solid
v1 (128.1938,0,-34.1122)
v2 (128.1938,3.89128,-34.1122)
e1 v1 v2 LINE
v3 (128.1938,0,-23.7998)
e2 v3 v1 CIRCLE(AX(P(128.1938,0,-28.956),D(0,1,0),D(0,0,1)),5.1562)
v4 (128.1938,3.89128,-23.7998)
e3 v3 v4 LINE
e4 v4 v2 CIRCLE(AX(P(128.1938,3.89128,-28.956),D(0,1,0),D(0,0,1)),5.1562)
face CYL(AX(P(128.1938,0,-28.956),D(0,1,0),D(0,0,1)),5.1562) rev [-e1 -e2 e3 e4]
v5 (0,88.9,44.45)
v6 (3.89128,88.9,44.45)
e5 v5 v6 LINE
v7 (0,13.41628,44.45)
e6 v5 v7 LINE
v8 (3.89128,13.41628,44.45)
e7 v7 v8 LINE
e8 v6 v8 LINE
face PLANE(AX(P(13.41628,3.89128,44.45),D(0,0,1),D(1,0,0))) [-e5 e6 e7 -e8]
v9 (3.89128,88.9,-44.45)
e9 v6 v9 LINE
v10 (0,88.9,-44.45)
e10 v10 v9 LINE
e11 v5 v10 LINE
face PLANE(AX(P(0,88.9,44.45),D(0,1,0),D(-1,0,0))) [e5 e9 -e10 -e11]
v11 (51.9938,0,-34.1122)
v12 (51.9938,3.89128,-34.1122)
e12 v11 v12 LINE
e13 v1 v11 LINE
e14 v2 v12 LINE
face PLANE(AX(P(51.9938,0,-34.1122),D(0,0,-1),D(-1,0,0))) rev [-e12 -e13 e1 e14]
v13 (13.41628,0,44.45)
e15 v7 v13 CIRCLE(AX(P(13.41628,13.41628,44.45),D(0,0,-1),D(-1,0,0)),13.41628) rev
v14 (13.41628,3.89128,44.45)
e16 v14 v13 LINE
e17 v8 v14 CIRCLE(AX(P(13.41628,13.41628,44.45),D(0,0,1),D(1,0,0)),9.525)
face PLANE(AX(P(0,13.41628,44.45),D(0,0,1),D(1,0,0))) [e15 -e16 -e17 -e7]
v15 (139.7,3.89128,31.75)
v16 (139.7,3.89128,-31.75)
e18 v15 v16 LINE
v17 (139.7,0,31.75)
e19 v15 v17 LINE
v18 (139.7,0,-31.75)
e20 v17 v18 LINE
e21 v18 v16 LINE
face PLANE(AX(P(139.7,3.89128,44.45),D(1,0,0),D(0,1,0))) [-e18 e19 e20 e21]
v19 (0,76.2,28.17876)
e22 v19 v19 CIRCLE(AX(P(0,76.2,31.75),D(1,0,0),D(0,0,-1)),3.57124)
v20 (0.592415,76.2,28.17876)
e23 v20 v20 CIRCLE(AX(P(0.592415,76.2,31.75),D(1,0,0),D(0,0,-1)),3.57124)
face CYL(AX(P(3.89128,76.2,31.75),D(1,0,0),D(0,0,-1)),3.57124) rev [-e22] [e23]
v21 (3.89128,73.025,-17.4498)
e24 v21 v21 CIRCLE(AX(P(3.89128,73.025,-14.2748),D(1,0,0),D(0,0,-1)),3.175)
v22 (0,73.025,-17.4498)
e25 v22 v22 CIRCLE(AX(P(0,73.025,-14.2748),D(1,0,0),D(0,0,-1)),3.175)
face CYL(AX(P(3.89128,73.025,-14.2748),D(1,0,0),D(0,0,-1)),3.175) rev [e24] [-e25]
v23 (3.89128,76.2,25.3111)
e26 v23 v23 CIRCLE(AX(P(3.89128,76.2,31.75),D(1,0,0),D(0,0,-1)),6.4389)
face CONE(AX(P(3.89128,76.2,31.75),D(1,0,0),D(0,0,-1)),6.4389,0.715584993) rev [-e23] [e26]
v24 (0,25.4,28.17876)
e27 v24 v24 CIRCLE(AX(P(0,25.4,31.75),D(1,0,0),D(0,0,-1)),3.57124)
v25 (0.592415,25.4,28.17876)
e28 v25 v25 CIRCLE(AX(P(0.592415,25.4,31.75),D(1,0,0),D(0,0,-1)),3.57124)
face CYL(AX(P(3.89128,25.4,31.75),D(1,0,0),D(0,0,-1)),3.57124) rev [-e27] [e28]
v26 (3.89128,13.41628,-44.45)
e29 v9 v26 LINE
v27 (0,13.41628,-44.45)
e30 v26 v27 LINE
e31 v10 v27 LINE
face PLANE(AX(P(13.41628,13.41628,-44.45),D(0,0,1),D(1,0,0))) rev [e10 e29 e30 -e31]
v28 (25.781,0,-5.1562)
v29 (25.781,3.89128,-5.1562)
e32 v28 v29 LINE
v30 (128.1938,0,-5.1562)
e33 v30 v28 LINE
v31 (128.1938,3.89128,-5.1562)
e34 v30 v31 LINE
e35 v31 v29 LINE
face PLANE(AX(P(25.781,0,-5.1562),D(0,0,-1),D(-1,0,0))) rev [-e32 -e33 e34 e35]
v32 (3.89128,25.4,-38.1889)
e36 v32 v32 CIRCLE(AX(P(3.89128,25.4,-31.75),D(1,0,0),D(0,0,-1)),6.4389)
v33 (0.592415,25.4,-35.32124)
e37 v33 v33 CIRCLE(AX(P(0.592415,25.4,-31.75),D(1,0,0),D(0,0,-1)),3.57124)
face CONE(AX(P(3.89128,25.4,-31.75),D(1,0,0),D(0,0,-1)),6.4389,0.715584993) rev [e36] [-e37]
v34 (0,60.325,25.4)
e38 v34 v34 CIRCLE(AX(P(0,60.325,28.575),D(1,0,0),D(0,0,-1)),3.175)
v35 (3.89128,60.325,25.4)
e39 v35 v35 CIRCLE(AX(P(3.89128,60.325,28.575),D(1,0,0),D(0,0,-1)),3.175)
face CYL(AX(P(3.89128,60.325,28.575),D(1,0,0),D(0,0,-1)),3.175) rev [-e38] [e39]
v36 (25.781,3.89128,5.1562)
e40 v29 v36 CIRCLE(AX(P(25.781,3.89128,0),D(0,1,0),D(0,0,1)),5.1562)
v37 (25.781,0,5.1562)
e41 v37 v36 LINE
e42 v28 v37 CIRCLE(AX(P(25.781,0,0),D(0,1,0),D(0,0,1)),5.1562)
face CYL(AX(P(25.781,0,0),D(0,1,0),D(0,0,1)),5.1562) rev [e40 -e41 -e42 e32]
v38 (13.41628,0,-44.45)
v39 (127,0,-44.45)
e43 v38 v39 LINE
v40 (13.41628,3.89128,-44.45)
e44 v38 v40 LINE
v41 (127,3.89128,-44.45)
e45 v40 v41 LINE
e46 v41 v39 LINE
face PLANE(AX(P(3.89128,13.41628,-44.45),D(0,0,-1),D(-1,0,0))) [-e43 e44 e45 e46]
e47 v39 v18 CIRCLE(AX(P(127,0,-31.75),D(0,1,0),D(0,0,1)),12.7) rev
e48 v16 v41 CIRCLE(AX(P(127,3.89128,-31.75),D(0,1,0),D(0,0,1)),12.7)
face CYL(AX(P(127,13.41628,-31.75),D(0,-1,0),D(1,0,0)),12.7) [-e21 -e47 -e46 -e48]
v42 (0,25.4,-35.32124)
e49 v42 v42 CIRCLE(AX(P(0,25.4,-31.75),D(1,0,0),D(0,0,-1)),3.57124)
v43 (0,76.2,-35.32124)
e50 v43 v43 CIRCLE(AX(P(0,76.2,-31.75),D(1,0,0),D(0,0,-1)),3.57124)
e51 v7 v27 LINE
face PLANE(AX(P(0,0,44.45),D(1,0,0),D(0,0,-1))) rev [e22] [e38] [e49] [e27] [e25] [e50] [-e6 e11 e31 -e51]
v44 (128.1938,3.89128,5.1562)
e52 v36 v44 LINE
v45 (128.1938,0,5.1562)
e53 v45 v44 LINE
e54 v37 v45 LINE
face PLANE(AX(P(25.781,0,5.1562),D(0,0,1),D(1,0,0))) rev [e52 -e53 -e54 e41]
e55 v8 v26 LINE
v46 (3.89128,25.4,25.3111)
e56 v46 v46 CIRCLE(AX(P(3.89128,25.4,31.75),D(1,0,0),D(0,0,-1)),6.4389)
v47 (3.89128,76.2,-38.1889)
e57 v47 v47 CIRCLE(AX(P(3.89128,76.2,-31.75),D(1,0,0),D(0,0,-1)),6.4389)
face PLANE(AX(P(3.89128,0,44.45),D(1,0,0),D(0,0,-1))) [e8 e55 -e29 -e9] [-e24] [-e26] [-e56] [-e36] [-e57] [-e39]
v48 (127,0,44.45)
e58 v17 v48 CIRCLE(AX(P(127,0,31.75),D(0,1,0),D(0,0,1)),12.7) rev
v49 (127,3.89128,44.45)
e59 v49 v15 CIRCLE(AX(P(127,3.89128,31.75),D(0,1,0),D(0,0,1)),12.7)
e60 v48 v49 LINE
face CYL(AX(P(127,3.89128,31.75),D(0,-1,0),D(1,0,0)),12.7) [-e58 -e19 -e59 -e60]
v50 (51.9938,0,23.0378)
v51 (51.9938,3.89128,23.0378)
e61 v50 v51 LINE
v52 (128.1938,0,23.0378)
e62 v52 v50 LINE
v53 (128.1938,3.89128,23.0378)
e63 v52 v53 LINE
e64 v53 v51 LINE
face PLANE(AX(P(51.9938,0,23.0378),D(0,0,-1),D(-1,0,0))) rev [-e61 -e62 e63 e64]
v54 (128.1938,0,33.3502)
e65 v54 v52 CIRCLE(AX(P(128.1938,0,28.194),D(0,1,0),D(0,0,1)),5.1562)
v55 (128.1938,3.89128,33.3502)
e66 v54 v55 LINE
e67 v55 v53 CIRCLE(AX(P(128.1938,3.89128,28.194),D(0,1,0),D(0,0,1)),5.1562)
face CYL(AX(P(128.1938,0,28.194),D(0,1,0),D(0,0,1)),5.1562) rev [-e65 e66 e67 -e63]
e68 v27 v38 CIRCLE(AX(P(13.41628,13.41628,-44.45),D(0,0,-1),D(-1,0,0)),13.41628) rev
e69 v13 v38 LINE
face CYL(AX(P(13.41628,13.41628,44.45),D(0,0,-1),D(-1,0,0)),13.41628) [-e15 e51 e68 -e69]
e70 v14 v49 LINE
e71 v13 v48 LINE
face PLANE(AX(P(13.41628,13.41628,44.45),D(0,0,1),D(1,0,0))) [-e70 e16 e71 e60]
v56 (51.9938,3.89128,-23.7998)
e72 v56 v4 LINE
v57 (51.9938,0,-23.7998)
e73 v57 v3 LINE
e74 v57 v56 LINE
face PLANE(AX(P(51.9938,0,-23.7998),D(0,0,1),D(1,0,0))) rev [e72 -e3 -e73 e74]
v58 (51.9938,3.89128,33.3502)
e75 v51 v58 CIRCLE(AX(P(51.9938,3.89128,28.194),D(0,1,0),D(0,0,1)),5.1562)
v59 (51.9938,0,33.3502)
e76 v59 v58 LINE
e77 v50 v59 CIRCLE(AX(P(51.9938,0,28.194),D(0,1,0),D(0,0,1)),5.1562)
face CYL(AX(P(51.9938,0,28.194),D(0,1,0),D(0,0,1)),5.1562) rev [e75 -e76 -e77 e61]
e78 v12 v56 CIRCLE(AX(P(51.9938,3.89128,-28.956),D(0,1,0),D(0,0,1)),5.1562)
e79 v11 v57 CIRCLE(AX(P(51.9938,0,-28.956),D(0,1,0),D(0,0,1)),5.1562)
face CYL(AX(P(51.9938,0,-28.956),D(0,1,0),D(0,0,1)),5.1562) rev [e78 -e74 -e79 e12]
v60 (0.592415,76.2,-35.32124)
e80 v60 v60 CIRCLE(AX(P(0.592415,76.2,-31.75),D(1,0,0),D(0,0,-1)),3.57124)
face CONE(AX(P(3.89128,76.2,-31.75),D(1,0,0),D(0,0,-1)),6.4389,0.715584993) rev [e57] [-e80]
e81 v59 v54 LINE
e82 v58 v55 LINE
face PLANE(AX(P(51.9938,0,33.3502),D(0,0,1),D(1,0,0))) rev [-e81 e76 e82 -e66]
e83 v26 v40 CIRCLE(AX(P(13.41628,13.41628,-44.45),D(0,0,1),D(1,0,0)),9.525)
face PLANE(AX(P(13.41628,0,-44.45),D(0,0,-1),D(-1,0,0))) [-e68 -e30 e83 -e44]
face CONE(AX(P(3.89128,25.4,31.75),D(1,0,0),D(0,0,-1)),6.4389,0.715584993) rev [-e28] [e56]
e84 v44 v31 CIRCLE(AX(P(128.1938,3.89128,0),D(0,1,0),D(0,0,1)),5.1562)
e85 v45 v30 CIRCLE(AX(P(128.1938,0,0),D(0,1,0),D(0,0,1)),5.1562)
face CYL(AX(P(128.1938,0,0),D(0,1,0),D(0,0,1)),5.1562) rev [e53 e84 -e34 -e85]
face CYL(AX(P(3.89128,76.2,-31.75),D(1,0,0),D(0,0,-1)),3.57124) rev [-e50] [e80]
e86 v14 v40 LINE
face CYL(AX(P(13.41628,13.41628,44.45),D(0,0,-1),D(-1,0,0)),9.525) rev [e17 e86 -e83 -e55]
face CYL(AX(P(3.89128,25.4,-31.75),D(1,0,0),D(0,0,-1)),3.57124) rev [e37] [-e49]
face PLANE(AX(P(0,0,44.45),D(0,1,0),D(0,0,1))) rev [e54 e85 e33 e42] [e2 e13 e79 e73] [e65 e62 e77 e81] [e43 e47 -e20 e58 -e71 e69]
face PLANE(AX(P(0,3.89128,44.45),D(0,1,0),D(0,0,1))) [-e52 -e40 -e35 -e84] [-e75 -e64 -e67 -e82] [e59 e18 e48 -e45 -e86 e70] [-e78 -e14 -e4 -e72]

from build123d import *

# Parameters (mm, degrees)
BASE_FLANGE1_DEPTH          = 44.45
LONG_SLOT_DEPTH             = 170.46496681
SHORT_SLOT_DEPTH            = 170.46496681
LPATTERN1_COUNT             = 2
LPATTERN1_PITCH             = 57.15
LPATTERN2_COUNT             = 2
LPATTERN2_PITCH             = 63.5
LPATTERN2_COUNT_DIR2        = 2
LPATTERN2_PITCH_DIR2        = 50.8
F_1_4_0_25_DIAMETER_HOLE1_D = 6.35
FILLET1_R                   = 12.7


# Sheet-metal steps are written as plain solids
with BuildPart() as part:
    # Sketch1 → Base-Flange1 (new, symmetric)
    with BuildSketch(Plane.XY):
        with BuildLine():
            Line((139.7, 0), (13.41628, 0))
            ThreePointArc((13.41628, 0), (3.929537434, 3.929537434), (0, 13.41628))
            Line((0, 13.41628), (0, 88.9))
            Line((0, 88.9), (3.89128, 88.9))
            Line((3.89128, 88.9), (3.89128, 13.41628))
            ThreePointArc((3.89128, 13.41628), (6.681087909, 6.681087909), (13.41628, 3.89128))
            Line((13.41628, 3.89128), (139.7, 3.89128))
            Line((139.7, 3.89128), (139.7, 0))
        make_face()
    extrude(amount=BASE_FLANGE1_DEPTH, both=True)

    # Sketch4 → LONG-SLOT (cut, through all)
    with BuildSketch(Plane(origin=(0, 3.89128, 0), x_dir=(1, 0, 0), z_dir=(0, 1, 0))):
        with BuildLine():
            Line((25.781, 5.1562), (128.1938, 5.1562))
            ThreePointArc((128.1938, 5.1562), (133.35, 0), (128.1938, -5.1562))
            Line((128.1938, -5.1562), (25.781, -5.1562))
            ThreePointArc((25.781, -5.1562), (20.6248, 0), (25.781, 5.1562))
        make_face()
    extrude(amount=-LONG_SLOT_DEPTH, mode=Mode.SUBTRACT)

    # Sketch5 → SHORT-SLOT (cut, through all)
    with BuildSketch(Plane(origin=(0, 3.89128, 0), x_dir=(1, 0, 0), z_dir=(0, 1, 0))):
        with BuildLine():
            Line((51.9938, -23.0378), (128.1938, -23.0378))
            ThreePointArc((128.1938, -23.0378), (133.35, -28.194), (128.1938, -33.3502))
            Line((128.1938, -33.3502), (51.9938, -33.3502))
            ThreePointArc((51.9938, -33.3502), (46.8376, -28.194), (51.9938, -23.0378))
        make_face()
    short_slot = extrude(amount=-SHORT_SLOT_DEPTH, mode=Mode.SUBTRACT)

    # LPattern1: SHORT-SLOT ×2
    with Locations(*[(0, 0, -i * LPATTERN1_PITCH) for i in range(1, LPATTERN1_COUNT)]):
        add(short_slot, mode=Mode.SUBTRACT)

    # Sketch6 → CSK for 1/4 Flat Head Machine Screw1 (revolve, cut)
    with BuildSketch(Plane(origin=(3.89128, 76.2, 31.75), x_dir=(0, 0, -1), z_dir=(0, 1, 0))):
        Polygon((0, 0), (0, 3.89128), (3.57124, 3.89128), (3.57124, 3.298865467), (6.4389, 0), align=None)
    csk_for_1_4_flat_head_machine_screw1 = revolve(axis=Axis((10.24128, 76.2, 31.75), (-1, 0, 0)), mode=Mode.SUBTRACT)

    # LPattern2: CSK for 1_4 Flat Head Machine Screw1 2 × 2
    with Locations(*[(0, -j * LPATTERN2_PITCH_DIR2, -i * LPATTERN2_PITCH) for i in range(LPATTERN2_COUNT) for j in range(LPATTERN2_COUNT_DIR2) if (i, j) != (0, 0)]):
        add(csk_for_1_4_flat_head_machine_screw1, mode=Mode.SUBTRACT)

    # 1/4 (0.25) Diameter Hole1 (through all)
    with Locations(Plane(origin=(3.89128, 0, 0), x_dir=(0, 0, -1), z_dir=(1, 0, 0))):
        with Locations((-28.575, 60.325), (14.2748, 73.025)):
            Hole(F_1_4_0_25_DIAMETER_HOLE1_D / 2)

    # Fillet1
    fillet1_edges = [part.edges().sort_by_distance(p)[0] for p in [
        (139.7, 1.94564, 44.45),
        (139.7, 1.94564, -44.45),
    ]]
    fillet(fillet1_edges, radius=FILLET1_R)


solid = part.part
